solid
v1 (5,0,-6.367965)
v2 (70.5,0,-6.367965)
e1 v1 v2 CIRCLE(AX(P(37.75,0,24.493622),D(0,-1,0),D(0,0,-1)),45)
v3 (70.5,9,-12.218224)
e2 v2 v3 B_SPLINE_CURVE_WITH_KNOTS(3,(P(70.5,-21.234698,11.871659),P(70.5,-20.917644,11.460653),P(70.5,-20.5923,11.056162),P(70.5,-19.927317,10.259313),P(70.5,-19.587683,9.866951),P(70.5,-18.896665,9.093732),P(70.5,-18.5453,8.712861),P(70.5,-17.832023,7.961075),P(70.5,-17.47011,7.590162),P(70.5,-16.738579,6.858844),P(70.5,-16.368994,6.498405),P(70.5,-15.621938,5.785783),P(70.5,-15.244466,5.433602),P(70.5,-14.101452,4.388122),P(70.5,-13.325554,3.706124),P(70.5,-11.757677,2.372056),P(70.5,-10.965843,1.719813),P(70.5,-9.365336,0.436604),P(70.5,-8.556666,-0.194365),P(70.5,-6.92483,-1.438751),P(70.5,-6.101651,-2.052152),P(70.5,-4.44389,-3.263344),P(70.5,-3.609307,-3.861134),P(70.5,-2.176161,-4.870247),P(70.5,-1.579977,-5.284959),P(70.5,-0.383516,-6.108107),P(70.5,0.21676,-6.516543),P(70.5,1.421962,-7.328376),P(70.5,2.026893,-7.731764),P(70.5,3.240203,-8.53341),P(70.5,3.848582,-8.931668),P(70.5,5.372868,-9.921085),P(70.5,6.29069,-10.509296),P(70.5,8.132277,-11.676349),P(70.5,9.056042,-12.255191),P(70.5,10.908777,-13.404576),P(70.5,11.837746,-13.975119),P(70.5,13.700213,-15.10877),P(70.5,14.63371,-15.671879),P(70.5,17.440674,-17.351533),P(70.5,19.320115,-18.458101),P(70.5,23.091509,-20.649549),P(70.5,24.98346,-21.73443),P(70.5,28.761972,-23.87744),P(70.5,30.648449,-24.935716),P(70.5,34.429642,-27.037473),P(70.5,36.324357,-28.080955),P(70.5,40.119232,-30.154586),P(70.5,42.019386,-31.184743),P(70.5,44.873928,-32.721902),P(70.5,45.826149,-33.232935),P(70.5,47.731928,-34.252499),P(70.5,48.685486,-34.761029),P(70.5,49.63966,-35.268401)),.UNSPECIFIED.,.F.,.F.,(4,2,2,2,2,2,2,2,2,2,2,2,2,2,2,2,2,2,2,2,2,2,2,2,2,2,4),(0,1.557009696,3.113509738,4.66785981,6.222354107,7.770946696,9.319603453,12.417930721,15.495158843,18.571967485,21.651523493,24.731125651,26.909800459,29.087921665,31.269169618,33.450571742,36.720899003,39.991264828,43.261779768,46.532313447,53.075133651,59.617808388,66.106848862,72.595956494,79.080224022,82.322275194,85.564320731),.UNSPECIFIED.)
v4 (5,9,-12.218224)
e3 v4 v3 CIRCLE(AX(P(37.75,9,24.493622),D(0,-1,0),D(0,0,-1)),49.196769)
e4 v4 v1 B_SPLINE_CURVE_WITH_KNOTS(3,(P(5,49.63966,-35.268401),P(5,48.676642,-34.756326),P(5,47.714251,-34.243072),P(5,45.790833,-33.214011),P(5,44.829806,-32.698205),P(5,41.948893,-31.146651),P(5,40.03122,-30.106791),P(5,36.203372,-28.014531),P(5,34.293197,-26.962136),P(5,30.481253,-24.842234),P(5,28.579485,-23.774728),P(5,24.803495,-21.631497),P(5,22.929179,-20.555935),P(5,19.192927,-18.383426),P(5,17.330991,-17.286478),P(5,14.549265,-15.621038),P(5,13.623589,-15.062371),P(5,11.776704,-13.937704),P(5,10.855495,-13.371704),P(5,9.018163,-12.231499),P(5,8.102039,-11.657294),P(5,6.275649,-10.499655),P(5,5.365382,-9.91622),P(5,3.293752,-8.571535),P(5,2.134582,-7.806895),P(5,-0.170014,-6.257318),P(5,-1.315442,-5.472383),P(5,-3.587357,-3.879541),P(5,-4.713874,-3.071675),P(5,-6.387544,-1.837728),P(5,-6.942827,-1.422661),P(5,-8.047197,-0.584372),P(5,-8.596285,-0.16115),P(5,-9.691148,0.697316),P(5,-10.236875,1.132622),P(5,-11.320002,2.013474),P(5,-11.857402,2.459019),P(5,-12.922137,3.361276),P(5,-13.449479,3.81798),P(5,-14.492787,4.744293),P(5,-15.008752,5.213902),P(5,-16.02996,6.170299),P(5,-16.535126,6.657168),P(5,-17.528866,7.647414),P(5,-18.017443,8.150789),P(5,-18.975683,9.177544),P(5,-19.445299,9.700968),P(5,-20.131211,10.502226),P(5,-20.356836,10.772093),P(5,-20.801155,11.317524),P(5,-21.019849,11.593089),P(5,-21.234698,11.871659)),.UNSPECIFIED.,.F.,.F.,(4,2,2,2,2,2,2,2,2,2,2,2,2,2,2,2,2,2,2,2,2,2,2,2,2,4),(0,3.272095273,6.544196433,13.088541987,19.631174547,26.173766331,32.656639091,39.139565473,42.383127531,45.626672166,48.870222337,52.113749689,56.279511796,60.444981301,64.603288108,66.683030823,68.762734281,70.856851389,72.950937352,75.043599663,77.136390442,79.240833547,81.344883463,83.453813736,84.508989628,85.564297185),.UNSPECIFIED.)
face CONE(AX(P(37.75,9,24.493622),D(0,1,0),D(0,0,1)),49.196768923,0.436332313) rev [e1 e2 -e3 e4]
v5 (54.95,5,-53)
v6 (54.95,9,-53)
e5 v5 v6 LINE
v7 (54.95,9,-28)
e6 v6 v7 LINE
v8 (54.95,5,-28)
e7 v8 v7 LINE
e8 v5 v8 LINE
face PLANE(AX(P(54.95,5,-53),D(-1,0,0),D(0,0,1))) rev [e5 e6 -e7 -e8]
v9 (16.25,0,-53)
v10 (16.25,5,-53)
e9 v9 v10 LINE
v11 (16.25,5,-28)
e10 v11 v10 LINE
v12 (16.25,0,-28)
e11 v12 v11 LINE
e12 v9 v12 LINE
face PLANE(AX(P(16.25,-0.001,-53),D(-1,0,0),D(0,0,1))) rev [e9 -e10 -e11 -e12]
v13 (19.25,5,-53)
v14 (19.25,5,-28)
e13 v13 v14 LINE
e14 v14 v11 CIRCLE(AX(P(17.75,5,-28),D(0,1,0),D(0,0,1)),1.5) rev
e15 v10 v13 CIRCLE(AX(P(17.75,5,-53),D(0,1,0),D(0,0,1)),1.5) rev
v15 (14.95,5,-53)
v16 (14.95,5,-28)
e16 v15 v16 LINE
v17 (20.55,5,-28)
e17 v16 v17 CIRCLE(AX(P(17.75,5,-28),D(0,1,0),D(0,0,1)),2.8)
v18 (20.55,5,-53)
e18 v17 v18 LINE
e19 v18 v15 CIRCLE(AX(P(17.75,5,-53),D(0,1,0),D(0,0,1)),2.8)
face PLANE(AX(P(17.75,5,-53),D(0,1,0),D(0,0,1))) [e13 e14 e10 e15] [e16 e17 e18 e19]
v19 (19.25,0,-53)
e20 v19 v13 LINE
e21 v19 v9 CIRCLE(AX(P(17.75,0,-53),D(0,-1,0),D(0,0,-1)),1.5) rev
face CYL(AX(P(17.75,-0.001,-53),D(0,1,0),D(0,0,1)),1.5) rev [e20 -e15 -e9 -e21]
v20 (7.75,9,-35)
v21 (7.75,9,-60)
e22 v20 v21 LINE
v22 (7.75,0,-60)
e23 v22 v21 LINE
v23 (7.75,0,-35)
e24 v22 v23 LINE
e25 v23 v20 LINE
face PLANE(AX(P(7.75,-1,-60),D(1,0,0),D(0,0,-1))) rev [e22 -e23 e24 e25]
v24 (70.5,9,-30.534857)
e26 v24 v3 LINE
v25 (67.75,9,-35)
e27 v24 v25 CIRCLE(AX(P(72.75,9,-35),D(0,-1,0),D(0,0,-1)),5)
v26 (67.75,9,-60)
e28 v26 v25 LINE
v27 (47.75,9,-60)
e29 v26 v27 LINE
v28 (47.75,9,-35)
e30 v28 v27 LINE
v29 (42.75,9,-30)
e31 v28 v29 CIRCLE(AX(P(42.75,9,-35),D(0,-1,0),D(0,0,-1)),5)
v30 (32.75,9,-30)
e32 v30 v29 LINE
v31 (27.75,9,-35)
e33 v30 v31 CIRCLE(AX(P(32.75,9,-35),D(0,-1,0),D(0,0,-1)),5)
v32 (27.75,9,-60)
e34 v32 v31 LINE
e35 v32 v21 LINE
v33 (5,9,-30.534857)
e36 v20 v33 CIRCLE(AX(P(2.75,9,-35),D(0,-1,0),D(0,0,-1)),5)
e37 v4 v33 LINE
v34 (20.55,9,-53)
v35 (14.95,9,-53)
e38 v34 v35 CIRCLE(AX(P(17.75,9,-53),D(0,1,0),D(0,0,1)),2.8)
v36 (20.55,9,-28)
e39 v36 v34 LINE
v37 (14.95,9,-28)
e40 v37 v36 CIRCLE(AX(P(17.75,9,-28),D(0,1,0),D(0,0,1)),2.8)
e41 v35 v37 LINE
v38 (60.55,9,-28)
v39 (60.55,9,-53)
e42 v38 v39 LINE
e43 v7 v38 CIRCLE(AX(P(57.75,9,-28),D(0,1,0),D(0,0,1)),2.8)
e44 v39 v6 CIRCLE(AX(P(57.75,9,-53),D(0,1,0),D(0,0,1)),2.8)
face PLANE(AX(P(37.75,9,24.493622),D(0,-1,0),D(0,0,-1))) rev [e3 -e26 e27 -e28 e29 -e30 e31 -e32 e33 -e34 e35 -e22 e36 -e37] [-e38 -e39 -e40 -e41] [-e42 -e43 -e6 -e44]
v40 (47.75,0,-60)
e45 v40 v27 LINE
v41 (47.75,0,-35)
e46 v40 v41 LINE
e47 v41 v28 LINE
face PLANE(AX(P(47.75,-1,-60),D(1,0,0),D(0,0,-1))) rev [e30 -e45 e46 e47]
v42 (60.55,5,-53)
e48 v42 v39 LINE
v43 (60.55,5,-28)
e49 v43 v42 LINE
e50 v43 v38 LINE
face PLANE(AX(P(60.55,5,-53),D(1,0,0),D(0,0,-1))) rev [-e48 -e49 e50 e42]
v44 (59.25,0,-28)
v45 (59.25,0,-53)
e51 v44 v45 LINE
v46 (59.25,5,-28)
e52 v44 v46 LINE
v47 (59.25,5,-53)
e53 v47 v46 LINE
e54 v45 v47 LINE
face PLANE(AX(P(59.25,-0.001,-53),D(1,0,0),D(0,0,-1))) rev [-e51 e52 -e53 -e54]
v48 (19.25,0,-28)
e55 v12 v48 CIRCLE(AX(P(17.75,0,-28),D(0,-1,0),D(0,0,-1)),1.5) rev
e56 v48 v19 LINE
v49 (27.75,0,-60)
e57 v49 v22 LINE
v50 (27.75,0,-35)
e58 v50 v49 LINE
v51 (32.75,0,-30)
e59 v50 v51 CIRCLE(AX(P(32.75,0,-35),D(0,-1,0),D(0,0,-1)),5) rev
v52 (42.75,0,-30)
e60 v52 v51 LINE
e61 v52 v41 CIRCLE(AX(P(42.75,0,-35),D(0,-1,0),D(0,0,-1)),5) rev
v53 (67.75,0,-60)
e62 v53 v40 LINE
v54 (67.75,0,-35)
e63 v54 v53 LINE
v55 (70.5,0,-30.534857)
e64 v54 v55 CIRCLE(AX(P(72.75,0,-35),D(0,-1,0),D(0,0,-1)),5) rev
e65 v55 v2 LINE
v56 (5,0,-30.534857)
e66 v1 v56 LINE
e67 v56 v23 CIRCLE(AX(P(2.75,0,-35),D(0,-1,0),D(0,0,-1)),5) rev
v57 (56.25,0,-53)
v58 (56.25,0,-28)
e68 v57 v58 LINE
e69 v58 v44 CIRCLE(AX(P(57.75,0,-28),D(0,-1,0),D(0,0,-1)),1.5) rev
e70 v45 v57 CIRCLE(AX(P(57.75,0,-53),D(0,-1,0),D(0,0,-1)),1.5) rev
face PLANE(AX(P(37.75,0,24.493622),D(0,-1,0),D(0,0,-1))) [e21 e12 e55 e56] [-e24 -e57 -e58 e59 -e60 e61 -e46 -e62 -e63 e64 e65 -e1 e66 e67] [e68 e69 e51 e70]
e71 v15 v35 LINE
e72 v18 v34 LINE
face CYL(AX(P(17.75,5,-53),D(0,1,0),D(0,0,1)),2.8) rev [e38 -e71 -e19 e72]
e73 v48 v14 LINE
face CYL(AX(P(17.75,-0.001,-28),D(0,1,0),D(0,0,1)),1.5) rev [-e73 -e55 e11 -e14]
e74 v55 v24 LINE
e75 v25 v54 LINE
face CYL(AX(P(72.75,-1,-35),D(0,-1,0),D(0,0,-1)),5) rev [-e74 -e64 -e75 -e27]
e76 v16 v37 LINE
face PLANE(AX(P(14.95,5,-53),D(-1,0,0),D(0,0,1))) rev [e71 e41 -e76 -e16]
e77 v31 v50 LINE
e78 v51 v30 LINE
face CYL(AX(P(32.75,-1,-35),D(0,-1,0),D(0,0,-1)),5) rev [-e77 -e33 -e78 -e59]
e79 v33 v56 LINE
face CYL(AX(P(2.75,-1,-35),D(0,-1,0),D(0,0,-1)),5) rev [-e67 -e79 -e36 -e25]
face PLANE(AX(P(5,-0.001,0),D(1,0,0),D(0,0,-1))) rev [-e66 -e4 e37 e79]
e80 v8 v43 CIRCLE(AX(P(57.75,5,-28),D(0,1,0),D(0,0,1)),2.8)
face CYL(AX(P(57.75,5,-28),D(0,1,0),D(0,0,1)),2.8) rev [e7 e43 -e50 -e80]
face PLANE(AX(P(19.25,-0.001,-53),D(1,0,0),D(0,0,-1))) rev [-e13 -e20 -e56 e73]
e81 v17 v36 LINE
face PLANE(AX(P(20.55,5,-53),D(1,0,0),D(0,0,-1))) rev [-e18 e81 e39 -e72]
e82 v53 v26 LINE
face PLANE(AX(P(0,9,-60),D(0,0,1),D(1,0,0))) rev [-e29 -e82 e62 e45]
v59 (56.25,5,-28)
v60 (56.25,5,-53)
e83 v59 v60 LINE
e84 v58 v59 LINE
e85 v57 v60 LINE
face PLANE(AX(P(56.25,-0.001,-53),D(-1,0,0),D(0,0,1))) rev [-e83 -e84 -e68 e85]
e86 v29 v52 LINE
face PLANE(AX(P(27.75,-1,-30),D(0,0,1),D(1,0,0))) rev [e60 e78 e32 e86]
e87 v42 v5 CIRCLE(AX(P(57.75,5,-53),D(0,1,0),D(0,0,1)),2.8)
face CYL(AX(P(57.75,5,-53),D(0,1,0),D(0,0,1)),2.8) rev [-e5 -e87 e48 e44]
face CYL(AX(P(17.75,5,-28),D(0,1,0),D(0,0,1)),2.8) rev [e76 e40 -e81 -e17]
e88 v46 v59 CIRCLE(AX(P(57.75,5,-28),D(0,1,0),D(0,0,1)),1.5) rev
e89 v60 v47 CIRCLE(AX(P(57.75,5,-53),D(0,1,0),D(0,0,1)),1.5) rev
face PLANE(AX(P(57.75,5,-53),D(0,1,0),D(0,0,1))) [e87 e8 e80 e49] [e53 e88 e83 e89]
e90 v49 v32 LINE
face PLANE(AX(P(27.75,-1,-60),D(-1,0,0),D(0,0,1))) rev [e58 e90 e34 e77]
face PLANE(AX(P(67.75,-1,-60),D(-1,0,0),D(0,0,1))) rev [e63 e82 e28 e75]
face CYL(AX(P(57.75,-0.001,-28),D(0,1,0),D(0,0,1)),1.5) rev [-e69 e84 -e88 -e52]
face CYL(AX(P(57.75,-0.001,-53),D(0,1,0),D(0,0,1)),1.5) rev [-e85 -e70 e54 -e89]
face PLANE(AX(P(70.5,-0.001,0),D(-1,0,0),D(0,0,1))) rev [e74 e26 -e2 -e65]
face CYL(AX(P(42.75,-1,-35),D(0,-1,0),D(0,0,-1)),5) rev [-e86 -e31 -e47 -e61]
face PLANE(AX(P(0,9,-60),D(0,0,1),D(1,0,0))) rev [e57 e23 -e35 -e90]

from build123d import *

# Parameters (mm, degrees)
BOSS_EXTRUDE1_DEPTH = 9
CUT_EXTRUDE2_REACH  = 98.857
SKETCH5_W           = 20
SKETCH5_H           = 30
SKETCH5_W_2         = 7.75
CUT_EXTRUDE3_DEPTH  = 10
FILLET1_R           = 5
CUT_EXTRUDE4_DEPTH  = 4
CHAMFER1_SIZE       = 9
CHAMFER1_SIZE_2     = 4.196768923
CUT_EXTRUDE5_REACH  = 98.857
SKETCH7_W           = 5
SKETCH7_H           = 33.085129134
SKETCH7_H_2         = 33.745309592


with BuildPart() as part:
    # Sketch1 → Boss-Extrude1 (new body)
    with BuildSketch(Plane(origin=(0, 0, 0), x_dir=(1, 0, 0), z_dir=(0, 1, 0))):
        with BuildLine():
            Line((0, 0), (0, 60))
            Line((0, 60), (75.5, 60))
            Line((75.5, 60), (75.5, 0))
            ThreePointArc((75.5, 0), (37.75, 20.506378381), (0, 0))
        make_face()
    extrude(amount=BOSS_EXTRUDE1_DEPTH)

    # Sketch4 → Cut-Extrude2 (cut, up to next)
    with BuildSketch(Plane(origin=(0, 9, 0), x_dir=(1, 0, 0), z_dir=(0, 1, 0)), mode=Mode.PRIVATE) as cut_extrude2_sk1:
        with BuildLine():
            Line((19.25, 53), (19.25, 28))
            ThreePointArc((19.25, 28), (17.75, 26.5), (16.25, 28))
            Line((16.25, 28), (16.25, 53))
            ThreePointArc((16.25, 53), (17.75, 54.5), (19.25, 53))
        make_face()
    cut_extrude2_tool1 = extrude(cut_extrude2_sk1.sketch, amount=-CUT_EXTRUDE2_REACH, mode=Mode.PRIVATE) & part.part
    # Sketch4 → Cut-Extrude2 (cut, up to next)
    with BuildSketch(Plane(origin=(0, 9, 0), x_dir=(1, 0, 0), z_dir=(0, 1, 0)), mode=Mode.PRIVATE) as cut_extrude2_sk2:
        with BuildLine():
            Line((59.25, 53), (59.25, 28))
            ThreePointArc((59.25, 28), (57.75, 26.5), (56.25, 28))
            Line((56.25, 28), (56.25, 53))
            ThreePointArc((56.25, 53), (57.75, 54.5), (59.25, 53))
        make_face()
    cut_extrude2_tool2 = extrude(cut_extrude2_sk2.sketch, amount=-CUT_EXTRUDE2_REACH, mode=Mode.PRIVATE) & part.part
    add(cut_extrude2_tool1.solids().sort_by_distance((17.75, 9, -40.5))[0], mode=Mode.SUBTRACT)
    add(cut_extrude2_tool2.solids().sort_by_distance((57.75, 9, -40.5))[0], mode=Mode.SUBTRACT)

    # Sketch5 → Cut-Extrude3 (cut)
    with BuildSketch(Plane(origin=(0, 9, 0), x_dir=(1, 0, 0), z_dir=(0, 1, 0))):
        with Locations((37.75, 45)):
            Rectangle(SKETCH5_W, SKETCH5_H)
        with Locations((71.625, 45)):
            Rectangle(SKETCH5_W_2, SKETCH5_H)
        with Locations((3.875, 45)):
            Rectangle(SKETCH5_W_2, SKETCH5_H)
    extrude(amount=-CUT_EXTRUDE3_DEPTH, mode=Mode.SUBTRACT)

    # Fillet1
    fillet1_edges = [part.edges().sort_by_distance(p)[0] for p in [
        (27.75, 4.5, -30),
        (47.75, 4.5, -30),
        (7.75, 4.5, -30),
        (67.75, 4.5, -30),
    ]]
    fillet(fillet1_edges, radius=FILLET1_R)

    # Sketch6 → Cut-Extrude4 (cut)
    with BuildSketch(Plane(origin=(0, 9, 0), x_dir=(1, 0, 0), z_dir=(0, 1, 0))):
        with BuildLine():
            Line((20.55, 53), (20.55, 28))
            ThreePointArc((20.55, 28), (17.75, 25.2), (14.95, 28))
            Line((14.95, 28), (14.95, 53))
            ThreePointArc((14.95, 53), (17.75, 55.8), (20.55, 53))
        make_face()
        with BuildLine():
            Line((60.55, 53), (60.55, 28))
            ThreePointArc((60.55, 28), (57.75, 25.2), (54.95, 28))
            Line((54.95, 28), (54.95, 53))
            ThreePointArc((54.95, 53), (57.75, 55.8), (60.55, 53))
        make_face()
    extrude(amount=-CUT_EXTRUDE4_DEPTH, mode=Mode.SUBTRACT)

    # Chamfer1
    # the kernel refuses this chamfer: 9, 4.196768923 mm, written as the material it takes off along each edge
    with BuildSketch(Plane(origin=(37.75, 9, 24.493621619), x_dir=(0.9983743289729347, 0, -0.05699736176212511), z_dir=(0.05699736176212511, 0, 0.9983743289729347))) as chamfer1_piece_1:
        Polygon((45, -CHAMFER1_SIZE), (45 + CHAMFER1_SIZE_2, 0), (45, 0), align=None)
    revolve(axis=Axis((37.75, 9, 24.493621619), (0, 1, 0)), revolution_arc=173.465041841, mode=Mode.SUBTRACT)

    # Sketch7 → Cut-Extrude5 (cut, up to next)
    with BuildSketch(Plane(origin=(0, 9, 0), x_dir=(1, 0, 0), z_dir=(0, 1, 0)), mode=Mode.PRIVATE) as cut_extrude5_sk1:
        with Locations((2.5, 16.542564567)):
            Rectangle(SKETCH7_W, SKETCH7_H)
    cut_extrude5_tool1 = extrude(cut_extrude5_sk1.sketch, amount=-CUT_EXTRUDE5_REACH, mode=Mode.PRIVATE) & part.part
    # Sketch7 → Cut-Extrude5 (cut, up to next)
    with BuildSketch(Plane(origin=(0, 9, 0), x_dir=(1, 0, 0), z_dir=(0, 1, 0)), mode=Mode.PRIVATE) as cut_extrude5_sk2:
        with Locations((73, 16.872654796)):
            Rectangle(SKETCH7_W, SKETCH7_H_2)
    cut_extrude5_tool2 = extrude(cut_extrude5_sk2.sketch, amount=-CUT_EXTRUDE5_REACH, mode=Mode.PRIVATE) & part.part
    add(cut_extrude5_tool1.solids().sort_by_distance((2.5, 9, -16.542565))[0], mode=Mode.SUBTRACT)
    add(cut_extrude5_tool2.solids().sort_by_distance((73, 9, -16.872655))[0], mode=Mode.SUBTRACT)


solid = part.part
